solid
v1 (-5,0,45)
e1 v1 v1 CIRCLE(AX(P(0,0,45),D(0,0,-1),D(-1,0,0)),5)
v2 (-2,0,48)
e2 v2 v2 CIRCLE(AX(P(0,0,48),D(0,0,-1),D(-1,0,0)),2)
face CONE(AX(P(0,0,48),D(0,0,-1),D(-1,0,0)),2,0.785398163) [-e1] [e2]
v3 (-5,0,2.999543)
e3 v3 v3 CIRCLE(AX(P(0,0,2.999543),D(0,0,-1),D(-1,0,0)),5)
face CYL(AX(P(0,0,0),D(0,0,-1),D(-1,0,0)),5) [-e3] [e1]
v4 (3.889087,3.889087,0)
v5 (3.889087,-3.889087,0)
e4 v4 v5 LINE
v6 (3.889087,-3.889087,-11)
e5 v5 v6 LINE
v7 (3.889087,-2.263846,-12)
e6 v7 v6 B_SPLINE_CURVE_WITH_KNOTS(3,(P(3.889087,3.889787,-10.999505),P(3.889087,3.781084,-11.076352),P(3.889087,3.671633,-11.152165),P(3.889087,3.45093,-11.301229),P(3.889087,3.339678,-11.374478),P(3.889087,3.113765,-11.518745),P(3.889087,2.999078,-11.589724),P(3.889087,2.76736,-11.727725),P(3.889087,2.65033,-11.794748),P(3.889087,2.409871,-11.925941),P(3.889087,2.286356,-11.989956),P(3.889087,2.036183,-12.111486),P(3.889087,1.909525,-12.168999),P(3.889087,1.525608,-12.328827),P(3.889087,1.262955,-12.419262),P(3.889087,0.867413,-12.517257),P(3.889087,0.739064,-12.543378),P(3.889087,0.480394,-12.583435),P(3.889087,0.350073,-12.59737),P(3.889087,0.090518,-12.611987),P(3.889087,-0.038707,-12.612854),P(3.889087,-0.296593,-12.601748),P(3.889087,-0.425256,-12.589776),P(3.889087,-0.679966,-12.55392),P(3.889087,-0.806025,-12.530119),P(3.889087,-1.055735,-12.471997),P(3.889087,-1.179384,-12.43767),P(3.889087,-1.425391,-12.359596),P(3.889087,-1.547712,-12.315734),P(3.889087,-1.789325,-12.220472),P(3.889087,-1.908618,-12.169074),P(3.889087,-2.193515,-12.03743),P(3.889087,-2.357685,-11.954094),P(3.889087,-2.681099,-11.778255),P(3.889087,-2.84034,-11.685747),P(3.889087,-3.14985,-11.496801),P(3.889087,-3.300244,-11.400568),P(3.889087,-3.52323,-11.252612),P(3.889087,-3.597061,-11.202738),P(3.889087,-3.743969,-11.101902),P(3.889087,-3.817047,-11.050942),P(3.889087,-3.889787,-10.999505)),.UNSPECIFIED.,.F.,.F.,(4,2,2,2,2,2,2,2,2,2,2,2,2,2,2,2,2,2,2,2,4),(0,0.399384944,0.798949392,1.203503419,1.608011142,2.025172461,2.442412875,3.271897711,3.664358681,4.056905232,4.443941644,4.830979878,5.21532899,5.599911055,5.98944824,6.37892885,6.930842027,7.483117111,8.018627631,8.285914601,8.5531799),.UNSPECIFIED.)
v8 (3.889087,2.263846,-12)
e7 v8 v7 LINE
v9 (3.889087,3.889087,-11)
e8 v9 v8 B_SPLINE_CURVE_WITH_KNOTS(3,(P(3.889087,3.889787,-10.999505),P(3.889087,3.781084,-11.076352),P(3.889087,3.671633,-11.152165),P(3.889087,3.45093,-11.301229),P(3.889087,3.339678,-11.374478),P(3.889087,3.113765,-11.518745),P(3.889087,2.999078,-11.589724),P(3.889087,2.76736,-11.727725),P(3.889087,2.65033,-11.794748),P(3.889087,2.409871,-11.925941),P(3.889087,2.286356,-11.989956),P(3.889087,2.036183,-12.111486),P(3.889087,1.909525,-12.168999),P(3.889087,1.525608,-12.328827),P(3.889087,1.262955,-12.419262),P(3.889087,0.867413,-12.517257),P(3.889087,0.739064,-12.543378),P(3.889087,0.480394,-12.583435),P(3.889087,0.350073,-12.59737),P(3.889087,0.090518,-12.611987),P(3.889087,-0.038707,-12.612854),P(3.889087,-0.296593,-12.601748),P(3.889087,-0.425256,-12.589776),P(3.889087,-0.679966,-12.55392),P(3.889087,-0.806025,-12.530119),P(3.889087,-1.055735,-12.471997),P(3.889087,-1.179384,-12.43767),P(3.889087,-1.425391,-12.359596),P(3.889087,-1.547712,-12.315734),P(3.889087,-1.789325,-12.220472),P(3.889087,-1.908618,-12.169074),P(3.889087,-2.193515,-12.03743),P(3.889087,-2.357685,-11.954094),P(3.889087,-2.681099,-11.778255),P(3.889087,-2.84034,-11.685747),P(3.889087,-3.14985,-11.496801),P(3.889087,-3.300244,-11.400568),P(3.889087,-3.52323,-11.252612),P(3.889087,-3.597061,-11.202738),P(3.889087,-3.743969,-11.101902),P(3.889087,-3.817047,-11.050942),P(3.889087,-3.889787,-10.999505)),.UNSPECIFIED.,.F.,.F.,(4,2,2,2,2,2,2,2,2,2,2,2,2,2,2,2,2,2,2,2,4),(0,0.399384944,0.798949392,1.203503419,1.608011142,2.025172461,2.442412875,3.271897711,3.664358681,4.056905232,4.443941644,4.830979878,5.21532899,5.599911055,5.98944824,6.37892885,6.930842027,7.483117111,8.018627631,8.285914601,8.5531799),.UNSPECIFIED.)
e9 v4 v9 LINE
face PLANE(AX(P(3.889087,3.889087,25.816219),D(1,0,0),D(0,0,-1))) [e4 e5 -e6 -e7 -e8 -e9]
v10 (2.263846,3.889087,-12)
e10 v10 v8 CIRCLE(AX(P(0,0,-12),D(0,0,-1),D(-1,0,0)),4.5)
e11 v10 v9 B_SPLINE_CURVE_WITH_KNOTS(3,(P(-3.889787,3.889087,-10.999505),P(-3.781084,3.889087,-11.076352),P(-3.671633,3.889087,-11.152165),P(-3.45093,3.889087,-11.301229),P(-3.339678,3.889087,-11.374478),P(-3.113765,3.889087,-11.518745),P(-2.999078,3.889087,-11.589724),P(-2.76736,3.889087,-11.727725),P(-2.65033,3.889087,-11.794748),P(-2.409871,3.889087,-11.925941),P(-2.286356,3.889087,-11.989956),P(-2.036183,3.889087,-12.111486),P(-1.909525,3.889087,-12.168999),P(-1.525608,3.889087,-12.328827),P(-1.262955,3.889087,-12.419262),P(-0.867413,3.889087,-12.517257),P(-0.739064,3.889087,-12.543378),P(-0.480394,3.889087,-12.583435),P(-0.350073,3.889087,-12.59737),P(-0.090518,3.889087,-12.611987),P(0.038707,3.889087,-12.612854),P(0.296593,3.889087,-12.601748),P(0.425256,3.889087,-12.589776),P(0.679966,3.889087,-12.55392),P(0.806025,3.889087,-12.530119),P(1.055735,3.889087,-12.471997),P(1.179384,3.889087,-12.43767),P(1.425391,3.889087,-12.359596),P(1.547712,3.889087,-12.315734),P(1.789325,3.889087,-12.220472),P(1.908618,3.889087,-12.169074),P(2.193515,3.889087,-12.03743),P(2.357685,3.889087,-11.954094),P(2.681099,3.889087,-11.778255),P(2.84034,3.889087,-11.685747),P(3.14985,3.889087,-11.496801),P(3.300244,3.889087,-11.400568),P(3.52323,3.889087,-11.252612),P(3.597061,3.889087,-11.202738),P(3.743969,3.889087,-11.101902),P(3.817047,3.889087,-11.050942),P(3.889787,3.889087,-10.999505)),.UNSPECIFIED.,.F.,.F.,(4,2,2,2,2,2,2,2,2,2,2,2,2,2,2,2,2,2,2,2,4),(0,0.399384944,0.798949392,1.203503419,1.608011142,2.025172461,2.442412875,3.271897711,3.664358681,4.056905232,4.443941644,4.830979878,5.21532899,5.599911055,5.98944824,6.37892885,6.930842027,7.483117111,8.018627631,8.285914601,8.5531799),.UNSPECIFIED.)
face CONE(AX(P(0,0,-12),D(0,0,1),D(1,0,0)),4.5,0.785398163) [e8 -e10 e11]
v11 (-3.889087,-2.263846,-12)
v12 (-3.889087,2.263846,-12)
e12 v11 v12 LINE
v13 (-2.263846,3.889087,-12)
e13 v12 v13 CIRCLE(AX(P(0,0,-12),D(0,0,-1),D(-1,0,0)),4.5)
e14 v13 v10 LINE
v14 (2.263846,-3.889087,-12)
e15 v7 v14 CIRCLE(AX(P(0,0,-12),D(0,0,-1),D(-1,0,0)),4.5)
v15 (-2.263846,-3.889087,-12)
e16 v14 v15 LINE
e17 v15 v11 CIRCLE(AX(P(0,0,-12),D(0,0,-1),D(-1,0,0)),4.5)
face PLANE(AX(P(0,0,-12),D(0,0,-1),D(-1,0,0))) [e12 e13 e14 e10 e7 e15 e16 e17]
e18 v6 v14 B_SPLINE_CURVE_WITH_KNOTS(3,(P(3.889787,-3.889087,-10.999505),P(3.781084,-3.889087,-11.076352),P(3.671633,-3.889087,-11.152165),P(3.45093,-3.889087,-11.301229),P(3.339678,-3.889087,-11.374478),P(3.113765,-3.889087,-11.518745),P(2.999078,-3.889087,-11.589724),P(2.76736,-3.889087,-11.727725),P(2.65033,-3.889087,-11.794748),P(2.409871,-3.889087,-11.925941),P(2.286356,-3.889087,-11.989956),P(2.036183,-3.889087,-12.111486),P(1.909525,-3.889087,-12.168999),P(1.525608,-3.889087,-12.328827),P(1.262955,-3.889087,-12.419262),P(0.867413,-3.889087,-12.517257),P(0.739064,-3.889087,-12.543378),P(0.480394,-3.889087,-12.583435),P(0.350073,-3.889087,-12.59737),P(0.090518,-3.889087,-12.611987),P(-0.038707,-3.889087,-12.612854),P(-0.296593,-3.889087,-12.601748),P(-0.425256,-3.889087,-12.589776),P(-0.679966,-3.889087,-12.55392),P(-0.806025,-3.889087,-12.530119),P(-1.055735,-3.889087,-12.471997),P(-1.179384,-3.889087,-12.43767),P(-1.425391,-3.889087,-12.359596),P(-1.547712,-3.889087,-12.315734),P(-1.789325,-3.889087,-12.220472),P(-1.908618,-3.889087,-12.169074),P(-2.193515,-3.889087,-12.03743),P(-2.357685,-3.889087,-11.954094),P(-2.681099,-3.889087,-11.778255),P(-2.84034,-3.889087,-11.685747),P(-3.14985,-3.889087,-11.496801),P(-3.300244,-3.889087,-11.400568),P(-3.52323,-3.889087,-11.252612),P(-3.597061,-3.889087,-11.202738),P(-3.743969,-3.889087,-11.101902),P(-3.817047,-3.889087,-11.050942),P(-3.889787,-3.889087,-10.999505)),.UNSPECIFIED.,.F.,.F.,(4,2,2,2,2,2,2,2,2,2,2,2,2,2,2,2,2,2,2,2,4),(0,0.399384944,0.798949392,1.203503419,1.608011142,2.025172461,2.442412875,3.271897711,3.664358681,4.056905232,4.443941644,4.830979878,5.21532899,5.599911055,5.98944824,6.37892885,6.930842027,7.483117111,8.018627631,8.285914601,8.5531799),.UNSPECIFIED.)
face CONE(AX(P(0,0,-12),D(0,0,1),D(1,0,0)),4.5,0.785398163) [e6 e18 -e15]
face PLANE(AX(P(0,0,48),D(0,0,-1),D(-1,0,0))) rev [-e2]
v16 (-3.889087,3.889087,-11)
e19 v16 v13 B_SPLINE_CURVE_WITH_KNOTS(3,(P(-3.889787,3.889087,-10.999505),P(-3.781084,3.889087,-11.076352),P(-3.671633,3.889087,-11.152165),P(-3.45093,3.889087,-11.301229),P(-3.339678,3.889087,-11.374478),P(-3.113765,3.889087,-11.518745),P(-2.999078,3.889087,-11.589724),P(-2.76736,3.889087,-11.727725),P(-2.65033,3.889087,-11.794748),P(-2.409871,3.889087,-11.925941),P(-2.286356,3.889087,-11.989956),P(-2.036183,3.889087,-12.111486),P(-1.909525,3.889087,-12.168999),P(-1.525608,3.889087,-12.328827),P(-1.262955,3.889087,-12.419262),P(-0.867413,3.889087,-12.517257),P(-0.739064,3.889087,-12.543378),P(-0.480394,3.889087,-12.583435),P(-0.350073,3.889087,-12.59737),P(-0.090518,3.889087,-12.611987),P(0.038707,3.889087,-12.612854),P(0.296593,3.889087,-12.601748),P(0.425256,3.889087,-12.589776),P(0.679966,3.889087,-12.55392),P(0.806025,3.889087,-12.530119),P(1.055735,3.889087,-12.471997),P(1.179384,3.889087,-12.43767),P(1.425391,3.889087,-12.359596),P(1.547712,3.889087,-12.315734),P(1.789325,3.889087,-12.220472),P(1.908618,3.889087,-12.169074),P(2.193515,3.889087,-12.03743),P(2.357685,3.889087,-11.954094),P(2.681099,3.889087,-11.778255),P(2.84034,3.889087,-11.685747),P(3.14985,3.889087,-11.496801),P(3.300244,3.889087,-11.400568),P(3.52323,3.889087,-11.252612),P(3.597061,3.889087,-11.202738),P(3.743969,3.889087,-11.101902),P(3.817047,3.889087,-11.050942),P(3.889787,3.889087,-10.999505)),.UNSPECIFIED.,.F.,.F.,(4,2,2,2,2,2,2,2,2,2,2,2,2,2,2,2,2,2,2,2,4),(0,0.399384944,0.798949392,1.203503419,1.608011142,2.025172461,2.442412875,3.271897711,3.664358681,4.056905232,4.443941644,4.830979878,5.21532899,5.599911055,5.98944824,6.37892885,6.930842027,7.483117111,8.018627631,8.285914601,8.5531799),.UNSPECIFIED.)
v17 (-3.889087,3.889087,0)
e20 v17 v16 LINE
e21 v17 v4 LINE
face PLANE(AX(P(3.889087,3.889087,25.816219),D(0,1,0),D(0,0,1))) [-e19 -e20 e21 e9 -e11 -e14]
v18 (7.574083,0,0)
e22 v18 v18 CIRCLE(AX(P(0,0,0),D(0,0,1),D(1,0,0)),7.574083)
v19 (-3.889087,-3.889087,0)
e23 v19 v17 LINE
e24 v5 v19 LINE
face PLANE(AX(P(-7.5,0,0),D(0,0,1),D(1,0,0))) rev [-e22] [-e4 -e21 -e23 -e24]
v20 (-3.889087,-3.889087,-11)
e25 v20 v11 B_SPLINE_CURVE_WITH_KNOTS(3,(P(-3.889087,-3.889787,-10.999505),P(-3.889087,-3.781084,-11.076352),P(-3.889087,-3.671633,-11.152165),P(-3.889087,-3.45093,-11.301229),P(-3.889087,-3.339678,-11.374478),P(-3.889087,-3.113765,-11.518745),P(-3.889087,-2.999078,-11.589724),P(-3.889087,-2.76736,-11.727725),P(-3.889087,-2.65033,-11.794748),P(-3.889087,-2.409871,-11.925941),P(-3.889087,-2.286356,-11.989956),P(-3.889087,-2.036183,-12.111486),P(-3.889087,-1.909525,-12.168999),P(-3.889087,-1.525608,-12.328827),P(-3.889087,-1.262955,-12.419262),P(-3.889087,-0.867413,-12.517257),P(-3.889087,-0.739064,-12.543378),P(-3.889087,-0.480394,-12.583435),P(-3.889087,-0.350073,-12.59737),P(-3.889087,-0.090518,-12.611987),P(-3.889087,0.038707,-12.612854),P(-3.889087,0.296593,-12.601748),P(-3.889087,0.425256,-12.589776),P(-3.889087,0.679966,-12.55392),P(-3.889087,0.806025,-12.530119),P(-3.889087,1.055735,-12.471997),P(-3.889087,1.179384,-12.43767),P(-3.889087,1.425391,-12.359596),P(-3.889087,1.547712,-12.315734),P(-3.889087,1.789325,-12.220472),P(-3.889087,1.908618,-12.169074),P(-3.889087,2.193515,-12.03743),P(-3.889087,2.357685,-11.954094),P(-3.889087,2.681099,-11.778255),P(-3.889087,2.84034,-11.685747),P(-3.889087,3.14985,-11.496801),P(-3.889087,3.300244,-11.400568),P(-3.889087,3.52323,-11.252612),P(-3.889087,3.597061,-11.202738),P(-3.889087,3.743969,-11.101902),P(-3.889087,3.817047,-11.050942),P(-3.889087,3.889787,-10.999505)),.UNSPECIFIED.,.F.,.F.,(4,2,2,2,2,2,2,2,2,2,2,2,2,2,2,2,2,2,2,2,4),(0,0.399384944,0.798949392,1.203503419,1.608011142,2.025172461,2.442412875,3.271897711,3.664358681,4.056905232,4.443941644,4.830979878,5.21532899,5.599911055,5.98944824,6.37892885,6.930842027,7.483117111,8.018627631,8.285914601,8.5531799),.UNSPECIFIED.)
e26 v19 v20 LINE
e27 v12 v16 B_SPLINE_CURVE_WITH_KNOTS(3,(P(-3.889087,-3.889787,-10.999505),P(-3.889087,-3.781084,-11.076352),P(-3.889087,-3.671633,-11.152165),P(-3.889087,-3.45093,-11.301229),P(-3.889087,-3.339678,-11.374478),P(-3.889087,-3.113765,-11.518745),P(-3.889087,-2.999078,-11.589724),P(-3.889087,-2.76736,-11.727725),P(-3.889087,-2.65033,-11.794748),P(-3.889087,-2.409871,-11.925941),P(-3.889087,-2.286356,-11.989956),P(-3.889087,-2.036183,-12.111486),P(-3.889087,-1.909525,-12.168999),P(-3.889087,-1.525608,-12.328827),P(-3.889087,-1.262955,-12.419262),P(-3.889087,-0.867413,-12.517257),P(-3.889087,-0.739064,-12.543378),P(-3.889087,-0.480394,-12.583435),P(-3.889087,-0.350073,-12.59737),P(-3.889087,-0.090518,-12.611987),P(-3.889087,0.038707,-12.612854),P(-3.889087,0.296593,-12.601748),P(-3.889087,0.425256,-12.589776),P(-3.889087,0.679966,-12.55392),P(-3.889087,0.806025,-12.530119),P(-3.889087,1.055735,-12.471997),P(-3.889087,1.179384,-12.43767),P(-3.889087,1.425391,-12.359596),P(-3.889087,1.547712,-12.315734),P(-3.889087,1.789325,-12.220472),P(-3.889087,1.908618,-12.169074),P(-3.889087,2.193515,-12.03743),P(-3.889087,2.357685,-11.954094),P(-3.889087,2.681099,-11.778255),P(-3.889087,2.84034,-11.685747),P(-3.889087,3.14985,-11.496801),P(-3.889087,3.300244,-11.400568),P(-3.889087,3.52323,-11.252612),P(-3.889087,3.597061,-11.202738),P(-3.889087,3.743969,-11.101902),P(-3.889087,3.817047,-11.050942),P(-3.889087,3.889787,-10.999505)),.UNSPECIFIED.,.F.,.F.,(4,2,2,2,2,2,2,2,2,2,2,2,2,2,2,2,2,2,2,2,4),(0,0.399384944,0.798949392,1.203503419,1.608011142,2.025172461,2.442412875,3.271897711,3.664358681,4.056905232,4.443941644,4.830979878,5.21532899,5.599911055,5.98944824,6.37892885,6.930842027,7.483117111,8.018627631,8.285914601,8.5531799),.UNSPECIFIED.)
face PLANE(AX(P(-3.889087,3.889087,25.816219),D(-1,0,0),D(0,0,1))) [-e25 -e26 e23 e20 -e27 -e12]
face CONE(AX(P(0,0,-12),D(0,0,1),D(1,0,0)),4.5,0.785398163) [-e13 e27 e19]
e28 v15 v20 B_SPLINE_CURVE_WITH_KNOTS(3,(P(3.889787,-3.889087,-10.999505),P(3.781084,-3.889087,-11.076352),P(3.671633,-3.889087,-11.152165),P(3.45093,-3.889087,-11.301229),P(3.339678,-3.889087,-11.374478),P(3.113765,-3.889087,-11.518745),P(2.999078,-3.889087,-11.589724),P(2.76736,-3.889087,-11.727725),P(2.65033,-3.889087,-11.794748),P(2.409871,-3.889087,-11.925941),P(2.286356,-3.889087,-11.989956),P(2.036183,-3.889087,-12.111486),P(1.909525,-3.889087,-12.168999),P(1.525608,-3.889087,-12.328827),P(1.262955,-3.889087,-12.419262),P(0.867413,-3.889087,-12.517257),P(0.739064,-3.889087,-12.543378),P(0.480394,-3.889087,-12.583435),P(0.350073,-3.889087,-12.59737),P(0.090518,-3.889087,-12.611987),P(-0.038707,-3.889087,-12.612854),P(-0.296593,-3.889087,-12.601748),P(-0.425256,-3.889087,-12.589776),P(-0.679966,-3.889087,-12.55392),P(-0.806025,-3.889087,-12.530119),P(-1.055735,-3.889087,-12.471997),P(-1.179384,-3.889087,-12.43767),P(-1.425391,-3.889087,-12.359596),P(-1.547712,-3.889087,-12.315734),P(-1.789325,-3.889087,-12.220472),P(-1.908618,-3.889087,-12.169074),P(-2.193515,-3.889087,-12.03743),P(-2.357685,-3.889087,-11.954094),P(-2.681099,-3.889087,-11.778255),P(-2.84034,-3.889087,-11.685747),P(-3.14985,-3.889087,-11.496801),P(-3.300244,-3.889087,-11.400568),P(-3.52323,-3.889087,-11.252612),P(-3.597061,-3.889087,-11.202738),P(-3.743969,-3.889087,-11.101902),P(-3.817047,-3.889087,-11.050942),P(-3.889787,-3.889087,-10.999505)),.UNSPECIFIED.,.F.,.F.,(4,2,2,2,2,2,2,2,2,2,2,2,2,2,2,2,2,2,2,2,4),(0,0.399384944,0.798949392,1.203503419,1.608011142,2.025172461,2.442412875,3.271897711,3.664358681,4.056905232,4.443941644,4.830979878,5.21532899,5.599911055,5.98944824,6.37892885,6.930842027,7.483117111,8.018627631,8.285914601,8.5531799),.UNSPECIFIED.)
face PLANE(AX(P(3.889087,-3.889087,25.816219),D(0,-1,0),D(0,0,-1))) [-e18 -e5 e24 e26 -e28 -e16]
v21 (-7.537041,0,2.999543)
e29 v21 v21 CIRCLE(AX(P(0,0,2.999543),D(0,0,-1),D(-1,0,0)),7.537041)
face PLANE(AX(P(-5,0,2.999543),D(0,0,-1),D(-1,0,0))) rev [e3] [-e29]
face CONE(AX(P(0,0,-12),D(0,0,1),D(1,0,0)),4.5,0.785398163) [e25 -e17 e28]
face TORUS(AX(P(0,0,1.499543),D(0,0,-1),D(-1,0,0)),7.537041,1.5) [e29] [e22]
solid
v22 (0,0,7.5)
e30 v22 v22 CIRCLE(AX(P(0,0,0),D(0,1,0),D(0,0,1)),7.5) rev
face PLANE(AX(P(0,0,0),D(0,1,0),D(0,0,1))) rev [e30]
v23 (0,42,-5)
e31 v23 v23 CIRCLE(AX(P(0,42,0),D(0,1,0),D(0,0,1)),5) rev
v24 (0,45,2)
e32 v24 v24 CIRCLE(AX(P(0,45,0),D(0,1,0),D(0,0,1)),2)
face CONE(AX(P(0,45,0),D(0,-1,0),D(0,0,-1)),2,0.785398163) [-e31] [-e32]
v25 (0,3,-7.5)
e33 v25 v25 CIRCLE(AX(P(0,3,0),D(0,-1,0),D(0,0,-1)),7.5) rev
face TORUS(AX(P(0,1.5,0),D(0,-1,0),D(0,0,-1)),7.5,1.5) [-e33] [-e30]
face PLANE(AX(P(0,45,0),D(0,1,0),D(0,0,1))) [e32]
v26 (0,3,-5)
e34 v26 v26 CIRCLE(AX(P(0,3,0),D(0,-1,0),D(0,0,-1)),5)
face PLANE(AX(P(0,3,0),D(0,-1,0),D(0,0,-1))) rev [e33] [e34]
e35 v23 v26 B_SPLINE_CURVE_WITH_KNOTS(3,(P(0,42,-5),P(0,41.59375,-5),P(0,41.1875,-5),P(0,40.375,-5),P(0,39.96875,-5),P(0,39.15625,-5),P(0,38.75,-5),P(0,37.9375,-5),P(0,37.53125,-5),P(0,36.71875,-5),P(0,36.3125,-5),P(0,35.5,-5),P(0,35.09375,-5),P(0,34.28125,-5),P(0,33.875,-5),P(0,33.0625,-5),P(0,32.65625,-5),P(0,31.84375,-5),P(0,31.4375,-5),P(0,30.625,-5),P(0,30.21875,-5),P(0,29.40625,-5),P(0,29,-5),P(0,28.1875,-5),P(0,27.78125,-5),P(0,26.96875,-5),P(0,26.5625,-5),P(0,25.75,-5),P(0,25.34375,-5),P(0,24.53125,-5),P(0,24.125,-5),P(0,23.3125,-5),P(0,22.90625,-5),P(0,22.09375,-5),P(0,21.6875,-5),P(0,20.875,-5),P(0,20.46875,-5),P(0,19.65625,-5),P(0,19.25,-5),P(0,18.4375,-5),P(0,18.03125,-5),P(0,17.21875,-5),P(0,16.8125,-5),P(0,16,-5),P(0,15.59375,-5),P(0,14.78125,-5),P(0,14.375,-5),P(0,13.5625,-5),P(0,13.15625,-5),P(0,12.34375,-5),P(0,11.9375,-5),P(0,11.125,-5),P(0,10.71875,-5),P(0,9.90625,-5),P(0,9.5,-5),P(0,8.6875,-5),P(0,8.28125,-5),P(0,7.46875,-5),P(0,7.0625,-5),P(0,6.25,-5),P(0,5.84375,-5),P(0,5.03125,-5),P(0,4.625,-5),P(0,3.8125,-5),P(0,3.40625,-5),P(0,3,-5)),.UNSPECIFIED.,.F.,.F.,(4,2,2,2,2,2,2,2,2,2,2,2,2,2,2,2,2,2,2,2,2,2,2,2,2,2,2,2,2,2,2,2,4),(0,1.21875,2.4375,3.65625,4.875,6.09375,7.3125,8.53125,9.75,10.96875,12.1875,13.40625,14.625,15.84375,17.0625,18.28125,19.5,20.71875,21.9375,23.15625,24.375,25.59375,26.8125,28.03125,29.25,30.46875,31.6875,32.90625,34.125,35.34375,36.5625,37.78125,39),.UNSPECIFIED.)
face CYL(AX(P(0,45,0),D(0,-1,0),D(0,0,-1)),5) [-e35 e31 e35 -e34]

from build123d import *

# Parameters (mm, degrees)
SKETCH4_R           = 5.5
BOSS_EXTRUDE3_DEPTH = 12
CHAMFER2_SIZE       = 1
SKETCH5_OUTSIDE_W   = 33.118
SKETCH5_OUTSIDE_H   = 33.118
SKETCH5_OUTSIDE_W_2 = 7.778174594
SKETCH5_OUTSIDE_H_2 = 7.778174594
CUT_EXTRUDE1_DEPTH  = 12
SKETCH1_R           = 5
BOSS_EXTRUDE1_DEPTH = 45
CHAMFER1_SIZE       = 3
SKETCH2_R           = 9
BOSS_EXTRUDE2_DEPTH = 3
FILLET1_R           = 1.5


with BuildPart() as part:
    # Sketch3 → Revolve1 (revolve)
    with BuildSketch(Plane(origin=(0, 0, 0), x_dir=(1, 0, 0), z_dir=(0, 1, 0))):
        with BuildLine():
            Line((0, 0), (0, -48))
            Line((0, -48), (-2, -48))
            Line((-2, -48), (-5, -45))
            Line((-5, -45), (-5, -2.999542577))
            Line((-5, -2.999542577), (-7.537041341, -2.999542577))
            ThreePointArc((-7.537041341, -2.999542577), (-9.036926981, -1.481020494), (-7.5, 0))
            Line((-7.5, 0), (0, 0))
        make_face()
    revolve(axis=Axis((0, 0, 0), (0, 0, 1)))

    # Sketch4 → Boss-Extrude3 (add)
    with BuildSketch(Plane(origin=(0, 0, 0), x_dir=(-1, 0, 0), z_dir=(0, 0, -1))):
        with Locations(Location((0, 0, 0), (0, 0, 180))):
            Circle(SKETCH4_R)
    extrude(amount=BOSS_EXTRUDE3_DEPTH)

    # Chamfer2
    chamfer2_edges = [part.edges().sort_by_distance(p)[0] for p in [
        (-5.5, 0, -12),
    ]]
    chamfer(chamfer2_edges, length=CHAMFER2_SIZE)

    # Sketch5 outside → Cut-Extrude1 (cut)
    with BuildSketch(Plane(origin=(0, 0, -12), x_dir=(-1, 0, 0), z_dir=(0, 0, -1))):
        Rectangle(SKETCH5_OUTSIDE_W, SKETCH5_OUTSIDE_H)
        Rectangle(SKETCH5_OUTSIDE_W_2, SKETCH5_OUTSIDE_H_2, mode=Mode.SUBTRACT)
    extrude(amount=-CUT_EXTRUDE1_DEPTH, mode=Mode.SUBTRACT)


with BuildPart() as body_2:
    # Sketch1 → Boss-Extrude1 (new body)
    with BuildSketch(Plane(origin=(0, 0, 0), x_dir=(1, 0, 0), z_dir=(0, 1, 0))):
        with Locations(Location((0, 0, 0), (0, 0, 90))):
            Circle(SKETCH1_R)
    extrude(amount=BOSS_EXTRUDE1_DEPTH)

    # Chamfer1
    chamfer1_edges = [body_2.edges().sort_by_distance(p)[0] for p in [
        (0, 45, 5),
    ]]
    chamfer(chamfer1_edges, length=CHAMFER1_SIZE)

    # Sketch2 → Boss-Extrude2 (add)
    with BuildSketch(Plane.XZ):
        with Locations(Location((0, 0, 0), (0, 0, 270))):
            Circle(SKETCH2_R)
    extrude(amount=-BOSS_EXTRUDE2_DEPTH)

    # Fillet1
    fillet1_edges = [body_2.edges().sort_by_distance(p)[0] for p in [
        (0, 3, 9),
        (0, 0, 9),
    ]]
    fillet(fillet1_edges, radius=FILLET1_R - 0.0001)  # a hair under: the kernel refuses the full size


solid = Compound([part.part, body_2.part])
